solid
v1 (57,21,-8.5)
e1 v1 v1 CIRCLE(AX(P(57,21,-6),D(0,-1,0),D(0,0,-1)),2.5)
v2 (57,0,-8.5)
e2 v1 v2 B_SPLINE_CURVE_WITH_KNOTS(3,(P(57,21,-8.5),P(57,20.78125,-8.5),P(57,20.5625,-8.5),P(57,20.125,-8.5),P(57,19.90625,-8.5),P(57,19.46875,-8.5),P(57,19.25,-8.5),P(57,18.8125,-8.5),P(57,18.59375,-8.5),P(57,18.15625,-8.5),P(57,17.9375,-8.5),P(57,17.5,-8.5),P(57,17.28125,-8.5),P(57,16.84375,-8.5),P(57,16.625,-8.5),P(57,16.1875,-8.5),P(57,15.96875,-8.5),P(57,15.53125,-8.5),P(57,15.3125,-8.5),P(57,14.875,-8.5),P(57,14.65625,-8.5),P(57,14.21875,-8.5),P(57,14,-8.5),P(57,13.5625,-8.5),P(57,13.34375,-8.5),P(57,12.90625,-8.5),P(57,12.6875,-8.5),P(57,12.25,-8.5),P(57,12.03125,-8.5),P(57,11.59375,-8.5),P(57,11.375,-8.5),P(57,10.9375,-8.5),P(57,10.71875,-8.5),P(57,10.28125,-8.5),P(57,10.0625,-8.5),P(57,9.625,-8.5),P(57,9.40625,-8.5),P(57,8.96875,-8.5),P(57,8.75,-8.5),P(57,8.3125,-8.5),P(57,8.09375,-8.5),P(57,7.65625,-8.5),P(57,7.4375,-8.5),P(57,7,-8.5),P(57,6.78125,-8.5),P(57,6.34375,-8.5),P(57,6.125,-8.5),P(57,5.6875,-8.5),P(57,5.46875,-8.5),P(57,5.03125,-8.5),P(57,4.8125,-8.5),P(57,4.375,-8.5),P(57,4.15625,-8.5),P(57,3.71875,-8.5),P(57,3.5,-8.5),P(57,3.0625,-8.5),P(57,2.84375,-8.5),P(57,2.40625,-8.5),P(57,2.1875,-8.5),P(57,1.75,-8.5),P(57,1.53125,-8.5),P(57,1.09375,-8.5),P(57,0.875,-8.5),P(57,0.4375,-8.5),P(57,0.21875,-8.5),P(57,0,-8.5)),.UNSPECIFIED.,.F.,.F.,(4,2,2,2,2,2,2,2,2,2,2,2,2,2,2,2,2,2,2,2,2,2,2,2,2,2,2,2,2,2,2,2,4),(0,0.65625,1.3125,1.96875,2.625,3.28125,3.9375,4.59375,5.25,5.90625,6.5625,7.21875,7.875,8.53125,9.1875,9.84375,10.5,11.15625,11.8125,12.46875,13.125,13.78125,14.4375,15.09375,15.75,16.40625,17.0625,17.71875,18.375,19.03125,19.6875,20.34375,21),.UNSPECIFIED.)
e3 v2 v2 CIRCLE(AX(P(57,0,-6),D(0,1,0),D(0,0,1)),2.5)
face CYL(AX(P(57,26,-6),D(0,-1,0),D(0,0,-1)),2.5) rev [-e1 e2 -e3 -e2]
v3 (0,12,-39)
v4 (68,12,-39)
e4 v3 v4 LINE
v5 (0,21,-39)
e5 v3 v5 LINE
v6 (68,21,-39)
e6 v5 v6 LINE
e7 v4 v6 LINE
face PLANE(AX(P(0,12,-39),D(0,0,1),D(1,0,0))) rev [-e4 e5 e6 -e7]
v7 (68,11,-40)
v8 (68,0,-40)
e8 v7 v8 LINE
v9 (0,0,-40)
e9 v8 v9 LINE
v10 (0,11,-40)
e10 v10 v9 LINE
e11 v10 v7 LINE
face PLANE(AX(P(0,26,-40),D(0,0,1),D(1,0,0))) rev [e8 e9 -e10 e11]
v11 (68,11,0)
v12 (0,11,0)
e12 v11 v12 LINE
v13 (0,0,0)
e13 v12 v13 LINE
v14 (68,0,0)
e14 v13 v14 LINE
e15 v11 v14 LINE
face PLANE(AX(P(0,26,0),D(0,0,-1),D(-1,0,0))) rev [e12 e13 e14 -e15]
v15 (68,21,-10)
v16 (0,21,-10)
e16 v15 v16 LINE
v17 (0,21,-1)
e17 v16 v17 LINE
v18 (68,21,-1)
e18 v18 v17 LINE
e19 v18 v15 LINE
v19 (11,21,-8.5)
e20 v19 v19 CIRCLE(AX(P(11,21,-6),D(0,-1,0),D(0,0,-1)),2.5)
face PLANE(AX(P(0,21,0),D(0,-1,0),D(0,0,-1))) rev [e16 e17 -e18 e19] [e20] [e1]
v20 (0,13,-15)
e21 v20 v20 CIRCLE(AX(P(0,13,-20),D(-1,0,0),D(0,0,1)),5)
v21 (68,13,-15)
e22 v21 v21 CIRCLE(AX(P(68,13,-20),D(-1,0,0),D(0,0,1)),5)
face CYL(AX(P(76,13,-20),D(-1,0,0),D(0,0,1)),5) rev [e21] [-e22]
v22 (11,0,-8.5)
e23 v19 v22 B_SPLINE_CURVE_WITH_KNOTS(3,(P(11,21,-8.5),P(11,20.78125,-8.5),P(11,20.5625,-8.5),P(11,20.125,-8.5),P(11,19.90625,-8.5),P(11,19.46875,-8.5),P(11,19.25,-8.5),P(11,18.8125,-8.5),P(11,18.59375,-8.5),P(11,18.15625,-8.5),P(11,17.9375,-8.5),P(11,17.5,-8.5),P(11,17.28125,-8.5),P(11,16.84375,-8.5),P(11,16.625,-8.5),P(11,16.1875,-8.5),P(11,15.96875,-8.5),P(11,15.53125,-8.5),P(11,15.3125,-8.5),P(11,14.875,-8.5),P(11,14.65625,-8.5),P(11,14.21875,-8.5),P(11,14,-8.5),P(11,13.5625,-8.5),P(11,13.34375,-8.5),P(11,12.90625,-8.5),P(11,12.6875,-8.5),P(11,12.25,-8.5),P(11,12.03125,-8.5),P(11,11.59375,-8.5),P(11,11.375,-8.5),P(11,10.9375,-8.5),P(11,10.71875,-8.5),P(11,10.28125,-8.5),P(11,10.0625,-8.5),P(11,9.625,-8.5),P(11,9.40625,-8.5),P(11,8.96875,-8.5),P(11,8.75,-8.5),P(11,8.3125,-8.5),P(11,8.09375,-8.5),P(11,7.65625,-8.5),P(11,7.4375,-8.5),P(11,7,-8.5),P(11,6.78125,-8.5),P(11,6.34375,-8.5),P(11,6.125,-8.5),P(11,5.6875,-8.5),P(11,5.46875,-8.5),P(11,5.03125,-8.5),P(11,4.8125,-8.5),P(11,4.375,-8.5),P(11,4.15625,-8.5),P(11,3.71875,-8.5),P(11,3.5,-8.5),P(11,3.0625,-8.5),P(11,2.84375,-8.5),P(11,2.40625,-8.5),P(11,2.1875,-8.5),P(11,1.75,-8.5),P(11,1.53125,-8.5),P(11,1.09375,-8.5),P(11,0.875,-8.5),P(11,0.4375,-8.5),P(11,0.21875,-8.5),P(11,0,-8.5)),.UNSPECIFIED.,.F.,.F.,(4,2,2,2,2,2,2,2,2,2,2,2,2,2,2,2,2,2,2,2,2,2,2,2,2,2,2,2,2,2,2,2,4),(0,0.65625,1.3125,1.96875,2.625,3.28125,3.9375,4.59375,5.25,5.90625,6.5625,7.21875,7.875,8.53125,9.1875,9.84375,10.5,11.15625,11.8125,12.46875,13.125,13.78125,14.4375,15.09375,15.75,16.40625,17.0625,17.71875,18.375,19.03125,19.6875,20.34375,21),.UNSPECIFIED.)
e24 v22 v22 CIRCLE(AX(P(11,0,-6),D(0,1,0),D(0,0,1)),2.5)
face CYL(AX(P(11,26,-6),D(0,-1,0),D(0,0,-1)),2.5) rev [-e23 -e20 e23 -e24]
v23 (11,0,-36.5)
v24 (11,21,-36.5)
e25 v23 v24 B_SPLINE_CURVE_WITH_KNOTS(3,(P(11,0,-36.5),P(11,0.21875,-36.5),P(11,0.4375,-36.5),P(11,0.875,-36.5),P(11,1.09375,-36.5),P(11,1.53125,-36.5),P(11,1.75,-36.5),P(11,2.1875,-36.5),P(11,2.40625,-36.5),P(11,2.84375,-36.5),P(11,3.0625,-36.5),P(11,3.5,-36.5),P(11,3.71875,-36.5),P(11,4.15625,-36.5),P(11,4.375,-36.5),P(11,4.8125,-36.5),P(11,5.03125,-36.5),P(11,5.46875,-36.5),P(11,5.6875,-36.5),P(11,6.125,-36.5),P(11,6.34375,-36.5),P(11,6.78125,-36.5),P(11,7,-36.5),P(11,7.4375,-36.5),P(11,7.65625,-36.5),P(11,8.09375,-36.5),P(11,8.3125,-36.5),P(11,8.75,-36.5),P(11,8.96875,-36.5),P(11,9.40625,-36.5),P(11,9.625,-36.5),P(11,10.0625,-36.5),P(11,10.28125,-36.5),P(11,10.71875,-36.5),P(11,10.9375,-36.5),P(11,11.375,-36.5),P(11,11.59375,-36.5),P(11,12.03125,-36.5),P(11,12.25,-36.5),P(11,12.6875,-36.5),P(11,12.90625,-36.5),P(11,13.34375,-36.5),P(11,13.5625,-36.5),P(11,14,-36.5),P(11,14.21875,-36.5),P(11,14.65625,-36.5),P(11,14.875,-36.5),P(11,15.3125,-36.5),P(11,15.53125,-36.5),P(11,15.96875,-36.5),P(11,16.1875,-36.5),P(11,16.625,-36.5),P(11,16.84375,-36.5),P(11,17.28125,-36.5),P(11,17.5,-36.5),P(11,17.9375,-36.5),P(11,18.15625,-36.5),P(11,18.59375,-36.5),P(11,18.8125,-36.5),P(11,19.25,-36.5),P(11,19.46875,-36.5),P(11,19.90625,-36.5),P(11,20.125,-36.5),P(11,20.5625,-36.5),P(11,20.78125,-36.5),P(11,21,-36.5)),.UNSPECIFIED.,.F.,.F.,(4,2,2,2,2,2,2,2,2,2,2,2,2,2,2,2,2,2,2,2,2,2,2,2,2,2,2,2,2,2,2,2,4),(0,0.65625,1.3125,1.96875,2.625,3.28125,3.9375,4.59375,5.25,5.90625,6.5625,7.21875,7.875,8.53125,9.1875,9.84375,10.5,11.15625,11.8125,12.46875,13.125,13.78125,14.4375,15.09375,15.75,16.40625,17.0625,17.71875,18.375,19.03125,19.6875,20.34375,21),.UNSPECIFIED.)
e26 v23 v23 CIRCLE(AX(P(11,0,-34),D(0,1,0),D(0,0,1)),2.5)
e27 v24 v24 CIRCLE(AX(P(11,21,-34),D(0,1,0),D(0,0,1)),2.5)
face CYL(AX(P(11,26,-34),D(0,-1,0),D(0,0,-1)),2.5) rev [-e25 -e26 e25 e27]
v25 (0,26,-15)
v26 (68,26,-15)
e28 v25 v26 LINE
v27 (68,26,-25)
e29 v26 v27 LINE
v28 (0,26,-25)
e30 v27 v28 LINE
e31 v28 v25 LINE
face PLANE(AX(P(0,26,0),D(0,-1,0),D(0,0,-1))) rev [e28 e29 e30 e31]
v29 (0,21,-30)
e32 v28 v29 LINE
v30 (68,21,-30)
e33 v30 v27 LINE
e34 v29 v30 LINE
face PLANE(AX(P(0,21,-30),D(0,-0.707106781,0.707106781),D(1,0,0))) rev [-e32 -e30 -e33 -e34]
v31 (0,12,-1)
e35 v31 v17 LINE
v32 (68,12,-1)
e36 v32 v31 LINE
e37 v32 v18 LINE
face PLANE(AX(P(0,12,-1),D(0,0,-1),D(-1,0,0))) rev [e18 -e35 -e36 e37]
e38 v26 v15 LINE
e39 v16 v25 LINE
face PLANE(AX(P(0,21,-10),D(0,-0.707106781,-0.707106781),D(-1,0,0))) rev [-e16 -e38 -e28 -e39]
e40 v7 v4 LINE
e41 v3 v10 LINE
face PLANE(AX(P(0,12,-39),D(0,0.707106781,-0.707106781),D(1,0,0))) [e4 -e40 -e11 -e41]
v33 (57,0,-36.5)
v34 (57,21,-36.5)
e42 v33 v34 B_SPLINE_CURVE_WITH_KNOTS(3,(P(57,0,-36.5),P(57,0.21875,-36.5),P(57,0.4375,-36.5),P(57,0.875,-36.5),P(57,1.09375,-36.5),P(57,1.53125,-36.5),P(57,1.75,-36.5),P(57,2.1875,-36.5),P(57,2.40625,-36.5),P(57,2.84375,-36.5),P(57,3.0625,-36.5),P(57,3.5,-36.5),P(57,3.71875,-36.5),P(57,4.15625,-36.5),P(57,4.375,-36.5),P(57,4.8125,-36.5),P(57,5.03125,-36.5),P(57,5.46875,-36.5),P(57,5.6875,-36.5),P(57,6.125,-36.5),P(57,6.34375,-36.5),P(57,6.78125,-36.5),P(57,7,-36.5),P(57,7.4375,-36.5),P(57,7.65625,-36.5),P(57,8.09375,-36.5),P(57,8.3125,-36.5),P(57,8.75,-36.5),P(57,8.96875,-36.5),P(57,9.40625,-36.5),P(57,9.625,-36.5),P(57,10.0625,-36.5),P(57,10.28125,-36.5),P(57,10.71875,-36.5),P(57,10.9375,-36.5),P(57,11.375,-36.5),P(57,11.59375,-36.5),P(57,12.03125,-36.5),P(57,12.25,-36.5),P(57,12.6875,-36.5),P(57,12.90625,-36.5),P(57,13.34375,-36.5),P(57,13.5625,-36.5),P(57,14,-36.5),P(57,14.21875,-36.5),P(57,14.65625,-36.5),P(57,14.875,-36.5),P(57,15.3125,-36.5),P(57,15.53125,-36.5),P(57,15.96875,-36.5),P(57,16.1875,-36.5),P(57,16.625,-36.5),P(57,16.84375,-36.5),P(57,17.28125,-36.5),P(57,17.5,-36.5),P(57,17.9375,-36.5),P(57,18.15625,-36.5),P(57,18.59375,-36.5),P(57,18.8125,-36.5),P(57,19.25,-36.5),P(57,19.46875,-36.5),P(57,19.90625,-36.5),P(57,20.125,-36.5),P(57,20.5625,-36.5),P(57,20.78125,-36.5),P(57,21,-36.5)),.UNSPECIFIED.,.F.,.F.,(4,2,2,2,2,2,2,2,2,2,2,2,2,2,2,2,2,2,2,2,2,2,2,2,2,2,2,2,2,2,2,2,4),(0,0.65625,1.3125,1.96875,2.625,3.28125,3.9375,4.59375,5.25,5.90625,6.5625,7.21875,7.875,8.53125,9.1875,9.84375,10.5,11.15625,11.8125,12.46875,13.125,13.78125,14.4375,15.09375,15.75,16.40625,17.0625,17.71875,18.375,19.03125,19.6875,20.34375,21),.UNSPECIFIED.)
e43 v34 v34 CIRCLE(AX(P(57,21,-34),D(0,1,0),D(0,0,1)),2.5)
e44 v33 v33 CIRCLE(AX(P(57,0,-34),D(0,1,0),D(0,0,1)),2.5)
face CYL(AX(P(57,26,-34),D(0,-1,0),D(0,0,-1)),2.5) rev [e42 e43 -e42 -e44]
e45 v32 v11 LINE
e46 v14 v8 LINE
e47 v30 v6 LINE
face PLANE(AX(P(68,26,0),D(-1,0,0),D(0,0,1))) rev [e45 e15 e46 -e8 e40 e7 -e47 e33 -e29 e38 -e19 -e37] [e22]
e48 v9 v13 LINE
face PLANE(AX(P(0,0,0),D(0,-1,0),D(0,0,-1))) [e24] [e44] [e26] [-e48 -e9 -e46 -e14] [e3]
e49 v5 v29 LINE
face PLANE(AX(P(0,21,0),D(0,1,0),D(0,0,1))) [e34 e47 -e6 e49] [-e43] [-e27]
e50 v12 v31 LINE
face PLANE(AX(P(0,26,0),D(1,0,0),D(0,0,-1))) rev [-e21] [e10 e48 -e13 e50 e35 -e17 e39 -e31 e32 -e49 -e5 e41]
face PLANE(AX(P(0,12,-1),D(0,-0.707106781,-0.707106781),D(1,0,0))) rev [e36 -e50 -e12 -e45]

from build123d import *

# Parameters (mm, degrees)
SKETCH_1_W          = 68
SKETCH_1_H          = 40
SKETCH_1_R          = 2.5
EXTRUDE_1_DEPTH     = 26
SKETCH_2_R          = 5
CUT_EXTRUDE_1_DEPTH = 76
SKETCH_3_W          = 68
SKETCH_3_H          = 10
CUT_EXTRUDE_2_DEPTH = 5
CHAMFER_1_SIZE      = 5
CHAMFER_2_SIZE      = 5
SKETCH_4_W          = 68
SKETCH_4_H          = 1
CUT_EXTRUDE_3_DEPTH = 9
CHAMFER_3_SIZE      = 1
CHAMFER_4_SIZE      = 1


with BuildPart() as part:
    # Эскиз1 → Бобышка-Вытянуть1 (new body)
    with BuildSketch(Plane(origin=(0, 0, 0), x_dir=(1, 0, 0), z_dir=(0, 1, 0))):
        with Locations((34, 20)):
            Rectangle(SKETCH_1_W, SKETCH_1_H)
        with Locations(Location((11, 34, 0), (0, 0, 90))):
            Circle(SKETCH_1_R, mode=Mode.SUBTRACT)
        with Locations(Location((11, 6, 0), (0, 0, 90))):
            Circle(SKETCH_1_R, mode=Mode.SUBTRACT)
        with Locations(Location((57, 34, 0), (0, 0, 90))):
            Circle(SKETCH_1_R, mode=Mode.SUBTRACT)
        with Locations(Location((57, 6, 0), (0, 0, 90))):
            Circle(SKETCH_1_R, mode=Mode.SUBTRACT)
    extrude(amount=EXTRUDE_1_DEPTH)

    # Эскиз2 → Вырез-Вытянуть1 (cut)
    with BuildSketch(Plane.ZY):
        with Locations((-20, 13)):
            Circle(SKETCH_2_R)
    extrude(amount=-CUT_EXTRUDE_1_DEPTH, mode=Mode.SUBTRACT)

    # Эскиз3 → Вырез-Вытянуть2 (cut)
    with BuildSketch(Plane(origin=(0, 26, 0), x_dir=(1, 0, 0), z_dir=(0, 1, 0))):
        with Locations((34, 35)):
            Rectangle(SKETCH_3_W, SKETCH_3_H)
        with Locations((34, 5)):
            Rectangle(SKETCH_3_W, SKETCH_3_H)
    extrude(amount=-CUT_EXTRUDE_2_DEPTH, mode=Mode.SUBTRACT)

    # Фаска1
    chamfer_1_edges = [part.edges().sort_by_distance(p)[0] for p in [
        (34, 26, -30),
    ]]
    chamfer(chamfer_1_edges, length=CHAMFER_1_SIZE - 0.0001)  # a hair under: the kernel refuses the full size

    # Фаска2
    chamfer_2_edges = [part.edges().sort_by_distance(p)[0] for p in [
        (34, 26, -10),
    ]]
    chamfer(chamfer_2_edges, length=CHAMFER_2_SIZE - 0.0001)  # a hair under: the kernel refuses the full size

    # Эскиз4 → Вырез-Вытянуть3 (cut)
    with BuildSketch(Plane(origin=(0, 21, 0), x_dir=(1, 0, 0), z_dir=(0, 1, 0))):
        with Locations((34, 39.5)):
            Rectangle(SKETCH_4_W, SKETCH_4_H)
        with Locations((34, 0.5)):
            Rectangle(SKETCH_4_W, SKETCH_4_H)
    extrude(amount=-CUT_EXTRUDE_3_DEPTH, mode=Mode.SUBTRACT)

    # Фаска3
    chamfer_3_edges = [part.edges().sort_by_distance(p)[0] for p in [
        (34, 12, -40),
    ]]
    chamfer(chamfer_3_edges, length=CHAMFER_3_SIZE - 0.0001)  # a hair under: the kernel refuses the full size

    # Фаска4
    chamfer_4_edges = [part.edges().sort_by_distance(p)[0] for p in [
        (34, 12, 0),
    ]]
    chamfer(chamfer_4_edges, length=CHAMFER_4_SIZE - 0.0001)  # a hair under: the kernel refuses the full size


solid = part.part
